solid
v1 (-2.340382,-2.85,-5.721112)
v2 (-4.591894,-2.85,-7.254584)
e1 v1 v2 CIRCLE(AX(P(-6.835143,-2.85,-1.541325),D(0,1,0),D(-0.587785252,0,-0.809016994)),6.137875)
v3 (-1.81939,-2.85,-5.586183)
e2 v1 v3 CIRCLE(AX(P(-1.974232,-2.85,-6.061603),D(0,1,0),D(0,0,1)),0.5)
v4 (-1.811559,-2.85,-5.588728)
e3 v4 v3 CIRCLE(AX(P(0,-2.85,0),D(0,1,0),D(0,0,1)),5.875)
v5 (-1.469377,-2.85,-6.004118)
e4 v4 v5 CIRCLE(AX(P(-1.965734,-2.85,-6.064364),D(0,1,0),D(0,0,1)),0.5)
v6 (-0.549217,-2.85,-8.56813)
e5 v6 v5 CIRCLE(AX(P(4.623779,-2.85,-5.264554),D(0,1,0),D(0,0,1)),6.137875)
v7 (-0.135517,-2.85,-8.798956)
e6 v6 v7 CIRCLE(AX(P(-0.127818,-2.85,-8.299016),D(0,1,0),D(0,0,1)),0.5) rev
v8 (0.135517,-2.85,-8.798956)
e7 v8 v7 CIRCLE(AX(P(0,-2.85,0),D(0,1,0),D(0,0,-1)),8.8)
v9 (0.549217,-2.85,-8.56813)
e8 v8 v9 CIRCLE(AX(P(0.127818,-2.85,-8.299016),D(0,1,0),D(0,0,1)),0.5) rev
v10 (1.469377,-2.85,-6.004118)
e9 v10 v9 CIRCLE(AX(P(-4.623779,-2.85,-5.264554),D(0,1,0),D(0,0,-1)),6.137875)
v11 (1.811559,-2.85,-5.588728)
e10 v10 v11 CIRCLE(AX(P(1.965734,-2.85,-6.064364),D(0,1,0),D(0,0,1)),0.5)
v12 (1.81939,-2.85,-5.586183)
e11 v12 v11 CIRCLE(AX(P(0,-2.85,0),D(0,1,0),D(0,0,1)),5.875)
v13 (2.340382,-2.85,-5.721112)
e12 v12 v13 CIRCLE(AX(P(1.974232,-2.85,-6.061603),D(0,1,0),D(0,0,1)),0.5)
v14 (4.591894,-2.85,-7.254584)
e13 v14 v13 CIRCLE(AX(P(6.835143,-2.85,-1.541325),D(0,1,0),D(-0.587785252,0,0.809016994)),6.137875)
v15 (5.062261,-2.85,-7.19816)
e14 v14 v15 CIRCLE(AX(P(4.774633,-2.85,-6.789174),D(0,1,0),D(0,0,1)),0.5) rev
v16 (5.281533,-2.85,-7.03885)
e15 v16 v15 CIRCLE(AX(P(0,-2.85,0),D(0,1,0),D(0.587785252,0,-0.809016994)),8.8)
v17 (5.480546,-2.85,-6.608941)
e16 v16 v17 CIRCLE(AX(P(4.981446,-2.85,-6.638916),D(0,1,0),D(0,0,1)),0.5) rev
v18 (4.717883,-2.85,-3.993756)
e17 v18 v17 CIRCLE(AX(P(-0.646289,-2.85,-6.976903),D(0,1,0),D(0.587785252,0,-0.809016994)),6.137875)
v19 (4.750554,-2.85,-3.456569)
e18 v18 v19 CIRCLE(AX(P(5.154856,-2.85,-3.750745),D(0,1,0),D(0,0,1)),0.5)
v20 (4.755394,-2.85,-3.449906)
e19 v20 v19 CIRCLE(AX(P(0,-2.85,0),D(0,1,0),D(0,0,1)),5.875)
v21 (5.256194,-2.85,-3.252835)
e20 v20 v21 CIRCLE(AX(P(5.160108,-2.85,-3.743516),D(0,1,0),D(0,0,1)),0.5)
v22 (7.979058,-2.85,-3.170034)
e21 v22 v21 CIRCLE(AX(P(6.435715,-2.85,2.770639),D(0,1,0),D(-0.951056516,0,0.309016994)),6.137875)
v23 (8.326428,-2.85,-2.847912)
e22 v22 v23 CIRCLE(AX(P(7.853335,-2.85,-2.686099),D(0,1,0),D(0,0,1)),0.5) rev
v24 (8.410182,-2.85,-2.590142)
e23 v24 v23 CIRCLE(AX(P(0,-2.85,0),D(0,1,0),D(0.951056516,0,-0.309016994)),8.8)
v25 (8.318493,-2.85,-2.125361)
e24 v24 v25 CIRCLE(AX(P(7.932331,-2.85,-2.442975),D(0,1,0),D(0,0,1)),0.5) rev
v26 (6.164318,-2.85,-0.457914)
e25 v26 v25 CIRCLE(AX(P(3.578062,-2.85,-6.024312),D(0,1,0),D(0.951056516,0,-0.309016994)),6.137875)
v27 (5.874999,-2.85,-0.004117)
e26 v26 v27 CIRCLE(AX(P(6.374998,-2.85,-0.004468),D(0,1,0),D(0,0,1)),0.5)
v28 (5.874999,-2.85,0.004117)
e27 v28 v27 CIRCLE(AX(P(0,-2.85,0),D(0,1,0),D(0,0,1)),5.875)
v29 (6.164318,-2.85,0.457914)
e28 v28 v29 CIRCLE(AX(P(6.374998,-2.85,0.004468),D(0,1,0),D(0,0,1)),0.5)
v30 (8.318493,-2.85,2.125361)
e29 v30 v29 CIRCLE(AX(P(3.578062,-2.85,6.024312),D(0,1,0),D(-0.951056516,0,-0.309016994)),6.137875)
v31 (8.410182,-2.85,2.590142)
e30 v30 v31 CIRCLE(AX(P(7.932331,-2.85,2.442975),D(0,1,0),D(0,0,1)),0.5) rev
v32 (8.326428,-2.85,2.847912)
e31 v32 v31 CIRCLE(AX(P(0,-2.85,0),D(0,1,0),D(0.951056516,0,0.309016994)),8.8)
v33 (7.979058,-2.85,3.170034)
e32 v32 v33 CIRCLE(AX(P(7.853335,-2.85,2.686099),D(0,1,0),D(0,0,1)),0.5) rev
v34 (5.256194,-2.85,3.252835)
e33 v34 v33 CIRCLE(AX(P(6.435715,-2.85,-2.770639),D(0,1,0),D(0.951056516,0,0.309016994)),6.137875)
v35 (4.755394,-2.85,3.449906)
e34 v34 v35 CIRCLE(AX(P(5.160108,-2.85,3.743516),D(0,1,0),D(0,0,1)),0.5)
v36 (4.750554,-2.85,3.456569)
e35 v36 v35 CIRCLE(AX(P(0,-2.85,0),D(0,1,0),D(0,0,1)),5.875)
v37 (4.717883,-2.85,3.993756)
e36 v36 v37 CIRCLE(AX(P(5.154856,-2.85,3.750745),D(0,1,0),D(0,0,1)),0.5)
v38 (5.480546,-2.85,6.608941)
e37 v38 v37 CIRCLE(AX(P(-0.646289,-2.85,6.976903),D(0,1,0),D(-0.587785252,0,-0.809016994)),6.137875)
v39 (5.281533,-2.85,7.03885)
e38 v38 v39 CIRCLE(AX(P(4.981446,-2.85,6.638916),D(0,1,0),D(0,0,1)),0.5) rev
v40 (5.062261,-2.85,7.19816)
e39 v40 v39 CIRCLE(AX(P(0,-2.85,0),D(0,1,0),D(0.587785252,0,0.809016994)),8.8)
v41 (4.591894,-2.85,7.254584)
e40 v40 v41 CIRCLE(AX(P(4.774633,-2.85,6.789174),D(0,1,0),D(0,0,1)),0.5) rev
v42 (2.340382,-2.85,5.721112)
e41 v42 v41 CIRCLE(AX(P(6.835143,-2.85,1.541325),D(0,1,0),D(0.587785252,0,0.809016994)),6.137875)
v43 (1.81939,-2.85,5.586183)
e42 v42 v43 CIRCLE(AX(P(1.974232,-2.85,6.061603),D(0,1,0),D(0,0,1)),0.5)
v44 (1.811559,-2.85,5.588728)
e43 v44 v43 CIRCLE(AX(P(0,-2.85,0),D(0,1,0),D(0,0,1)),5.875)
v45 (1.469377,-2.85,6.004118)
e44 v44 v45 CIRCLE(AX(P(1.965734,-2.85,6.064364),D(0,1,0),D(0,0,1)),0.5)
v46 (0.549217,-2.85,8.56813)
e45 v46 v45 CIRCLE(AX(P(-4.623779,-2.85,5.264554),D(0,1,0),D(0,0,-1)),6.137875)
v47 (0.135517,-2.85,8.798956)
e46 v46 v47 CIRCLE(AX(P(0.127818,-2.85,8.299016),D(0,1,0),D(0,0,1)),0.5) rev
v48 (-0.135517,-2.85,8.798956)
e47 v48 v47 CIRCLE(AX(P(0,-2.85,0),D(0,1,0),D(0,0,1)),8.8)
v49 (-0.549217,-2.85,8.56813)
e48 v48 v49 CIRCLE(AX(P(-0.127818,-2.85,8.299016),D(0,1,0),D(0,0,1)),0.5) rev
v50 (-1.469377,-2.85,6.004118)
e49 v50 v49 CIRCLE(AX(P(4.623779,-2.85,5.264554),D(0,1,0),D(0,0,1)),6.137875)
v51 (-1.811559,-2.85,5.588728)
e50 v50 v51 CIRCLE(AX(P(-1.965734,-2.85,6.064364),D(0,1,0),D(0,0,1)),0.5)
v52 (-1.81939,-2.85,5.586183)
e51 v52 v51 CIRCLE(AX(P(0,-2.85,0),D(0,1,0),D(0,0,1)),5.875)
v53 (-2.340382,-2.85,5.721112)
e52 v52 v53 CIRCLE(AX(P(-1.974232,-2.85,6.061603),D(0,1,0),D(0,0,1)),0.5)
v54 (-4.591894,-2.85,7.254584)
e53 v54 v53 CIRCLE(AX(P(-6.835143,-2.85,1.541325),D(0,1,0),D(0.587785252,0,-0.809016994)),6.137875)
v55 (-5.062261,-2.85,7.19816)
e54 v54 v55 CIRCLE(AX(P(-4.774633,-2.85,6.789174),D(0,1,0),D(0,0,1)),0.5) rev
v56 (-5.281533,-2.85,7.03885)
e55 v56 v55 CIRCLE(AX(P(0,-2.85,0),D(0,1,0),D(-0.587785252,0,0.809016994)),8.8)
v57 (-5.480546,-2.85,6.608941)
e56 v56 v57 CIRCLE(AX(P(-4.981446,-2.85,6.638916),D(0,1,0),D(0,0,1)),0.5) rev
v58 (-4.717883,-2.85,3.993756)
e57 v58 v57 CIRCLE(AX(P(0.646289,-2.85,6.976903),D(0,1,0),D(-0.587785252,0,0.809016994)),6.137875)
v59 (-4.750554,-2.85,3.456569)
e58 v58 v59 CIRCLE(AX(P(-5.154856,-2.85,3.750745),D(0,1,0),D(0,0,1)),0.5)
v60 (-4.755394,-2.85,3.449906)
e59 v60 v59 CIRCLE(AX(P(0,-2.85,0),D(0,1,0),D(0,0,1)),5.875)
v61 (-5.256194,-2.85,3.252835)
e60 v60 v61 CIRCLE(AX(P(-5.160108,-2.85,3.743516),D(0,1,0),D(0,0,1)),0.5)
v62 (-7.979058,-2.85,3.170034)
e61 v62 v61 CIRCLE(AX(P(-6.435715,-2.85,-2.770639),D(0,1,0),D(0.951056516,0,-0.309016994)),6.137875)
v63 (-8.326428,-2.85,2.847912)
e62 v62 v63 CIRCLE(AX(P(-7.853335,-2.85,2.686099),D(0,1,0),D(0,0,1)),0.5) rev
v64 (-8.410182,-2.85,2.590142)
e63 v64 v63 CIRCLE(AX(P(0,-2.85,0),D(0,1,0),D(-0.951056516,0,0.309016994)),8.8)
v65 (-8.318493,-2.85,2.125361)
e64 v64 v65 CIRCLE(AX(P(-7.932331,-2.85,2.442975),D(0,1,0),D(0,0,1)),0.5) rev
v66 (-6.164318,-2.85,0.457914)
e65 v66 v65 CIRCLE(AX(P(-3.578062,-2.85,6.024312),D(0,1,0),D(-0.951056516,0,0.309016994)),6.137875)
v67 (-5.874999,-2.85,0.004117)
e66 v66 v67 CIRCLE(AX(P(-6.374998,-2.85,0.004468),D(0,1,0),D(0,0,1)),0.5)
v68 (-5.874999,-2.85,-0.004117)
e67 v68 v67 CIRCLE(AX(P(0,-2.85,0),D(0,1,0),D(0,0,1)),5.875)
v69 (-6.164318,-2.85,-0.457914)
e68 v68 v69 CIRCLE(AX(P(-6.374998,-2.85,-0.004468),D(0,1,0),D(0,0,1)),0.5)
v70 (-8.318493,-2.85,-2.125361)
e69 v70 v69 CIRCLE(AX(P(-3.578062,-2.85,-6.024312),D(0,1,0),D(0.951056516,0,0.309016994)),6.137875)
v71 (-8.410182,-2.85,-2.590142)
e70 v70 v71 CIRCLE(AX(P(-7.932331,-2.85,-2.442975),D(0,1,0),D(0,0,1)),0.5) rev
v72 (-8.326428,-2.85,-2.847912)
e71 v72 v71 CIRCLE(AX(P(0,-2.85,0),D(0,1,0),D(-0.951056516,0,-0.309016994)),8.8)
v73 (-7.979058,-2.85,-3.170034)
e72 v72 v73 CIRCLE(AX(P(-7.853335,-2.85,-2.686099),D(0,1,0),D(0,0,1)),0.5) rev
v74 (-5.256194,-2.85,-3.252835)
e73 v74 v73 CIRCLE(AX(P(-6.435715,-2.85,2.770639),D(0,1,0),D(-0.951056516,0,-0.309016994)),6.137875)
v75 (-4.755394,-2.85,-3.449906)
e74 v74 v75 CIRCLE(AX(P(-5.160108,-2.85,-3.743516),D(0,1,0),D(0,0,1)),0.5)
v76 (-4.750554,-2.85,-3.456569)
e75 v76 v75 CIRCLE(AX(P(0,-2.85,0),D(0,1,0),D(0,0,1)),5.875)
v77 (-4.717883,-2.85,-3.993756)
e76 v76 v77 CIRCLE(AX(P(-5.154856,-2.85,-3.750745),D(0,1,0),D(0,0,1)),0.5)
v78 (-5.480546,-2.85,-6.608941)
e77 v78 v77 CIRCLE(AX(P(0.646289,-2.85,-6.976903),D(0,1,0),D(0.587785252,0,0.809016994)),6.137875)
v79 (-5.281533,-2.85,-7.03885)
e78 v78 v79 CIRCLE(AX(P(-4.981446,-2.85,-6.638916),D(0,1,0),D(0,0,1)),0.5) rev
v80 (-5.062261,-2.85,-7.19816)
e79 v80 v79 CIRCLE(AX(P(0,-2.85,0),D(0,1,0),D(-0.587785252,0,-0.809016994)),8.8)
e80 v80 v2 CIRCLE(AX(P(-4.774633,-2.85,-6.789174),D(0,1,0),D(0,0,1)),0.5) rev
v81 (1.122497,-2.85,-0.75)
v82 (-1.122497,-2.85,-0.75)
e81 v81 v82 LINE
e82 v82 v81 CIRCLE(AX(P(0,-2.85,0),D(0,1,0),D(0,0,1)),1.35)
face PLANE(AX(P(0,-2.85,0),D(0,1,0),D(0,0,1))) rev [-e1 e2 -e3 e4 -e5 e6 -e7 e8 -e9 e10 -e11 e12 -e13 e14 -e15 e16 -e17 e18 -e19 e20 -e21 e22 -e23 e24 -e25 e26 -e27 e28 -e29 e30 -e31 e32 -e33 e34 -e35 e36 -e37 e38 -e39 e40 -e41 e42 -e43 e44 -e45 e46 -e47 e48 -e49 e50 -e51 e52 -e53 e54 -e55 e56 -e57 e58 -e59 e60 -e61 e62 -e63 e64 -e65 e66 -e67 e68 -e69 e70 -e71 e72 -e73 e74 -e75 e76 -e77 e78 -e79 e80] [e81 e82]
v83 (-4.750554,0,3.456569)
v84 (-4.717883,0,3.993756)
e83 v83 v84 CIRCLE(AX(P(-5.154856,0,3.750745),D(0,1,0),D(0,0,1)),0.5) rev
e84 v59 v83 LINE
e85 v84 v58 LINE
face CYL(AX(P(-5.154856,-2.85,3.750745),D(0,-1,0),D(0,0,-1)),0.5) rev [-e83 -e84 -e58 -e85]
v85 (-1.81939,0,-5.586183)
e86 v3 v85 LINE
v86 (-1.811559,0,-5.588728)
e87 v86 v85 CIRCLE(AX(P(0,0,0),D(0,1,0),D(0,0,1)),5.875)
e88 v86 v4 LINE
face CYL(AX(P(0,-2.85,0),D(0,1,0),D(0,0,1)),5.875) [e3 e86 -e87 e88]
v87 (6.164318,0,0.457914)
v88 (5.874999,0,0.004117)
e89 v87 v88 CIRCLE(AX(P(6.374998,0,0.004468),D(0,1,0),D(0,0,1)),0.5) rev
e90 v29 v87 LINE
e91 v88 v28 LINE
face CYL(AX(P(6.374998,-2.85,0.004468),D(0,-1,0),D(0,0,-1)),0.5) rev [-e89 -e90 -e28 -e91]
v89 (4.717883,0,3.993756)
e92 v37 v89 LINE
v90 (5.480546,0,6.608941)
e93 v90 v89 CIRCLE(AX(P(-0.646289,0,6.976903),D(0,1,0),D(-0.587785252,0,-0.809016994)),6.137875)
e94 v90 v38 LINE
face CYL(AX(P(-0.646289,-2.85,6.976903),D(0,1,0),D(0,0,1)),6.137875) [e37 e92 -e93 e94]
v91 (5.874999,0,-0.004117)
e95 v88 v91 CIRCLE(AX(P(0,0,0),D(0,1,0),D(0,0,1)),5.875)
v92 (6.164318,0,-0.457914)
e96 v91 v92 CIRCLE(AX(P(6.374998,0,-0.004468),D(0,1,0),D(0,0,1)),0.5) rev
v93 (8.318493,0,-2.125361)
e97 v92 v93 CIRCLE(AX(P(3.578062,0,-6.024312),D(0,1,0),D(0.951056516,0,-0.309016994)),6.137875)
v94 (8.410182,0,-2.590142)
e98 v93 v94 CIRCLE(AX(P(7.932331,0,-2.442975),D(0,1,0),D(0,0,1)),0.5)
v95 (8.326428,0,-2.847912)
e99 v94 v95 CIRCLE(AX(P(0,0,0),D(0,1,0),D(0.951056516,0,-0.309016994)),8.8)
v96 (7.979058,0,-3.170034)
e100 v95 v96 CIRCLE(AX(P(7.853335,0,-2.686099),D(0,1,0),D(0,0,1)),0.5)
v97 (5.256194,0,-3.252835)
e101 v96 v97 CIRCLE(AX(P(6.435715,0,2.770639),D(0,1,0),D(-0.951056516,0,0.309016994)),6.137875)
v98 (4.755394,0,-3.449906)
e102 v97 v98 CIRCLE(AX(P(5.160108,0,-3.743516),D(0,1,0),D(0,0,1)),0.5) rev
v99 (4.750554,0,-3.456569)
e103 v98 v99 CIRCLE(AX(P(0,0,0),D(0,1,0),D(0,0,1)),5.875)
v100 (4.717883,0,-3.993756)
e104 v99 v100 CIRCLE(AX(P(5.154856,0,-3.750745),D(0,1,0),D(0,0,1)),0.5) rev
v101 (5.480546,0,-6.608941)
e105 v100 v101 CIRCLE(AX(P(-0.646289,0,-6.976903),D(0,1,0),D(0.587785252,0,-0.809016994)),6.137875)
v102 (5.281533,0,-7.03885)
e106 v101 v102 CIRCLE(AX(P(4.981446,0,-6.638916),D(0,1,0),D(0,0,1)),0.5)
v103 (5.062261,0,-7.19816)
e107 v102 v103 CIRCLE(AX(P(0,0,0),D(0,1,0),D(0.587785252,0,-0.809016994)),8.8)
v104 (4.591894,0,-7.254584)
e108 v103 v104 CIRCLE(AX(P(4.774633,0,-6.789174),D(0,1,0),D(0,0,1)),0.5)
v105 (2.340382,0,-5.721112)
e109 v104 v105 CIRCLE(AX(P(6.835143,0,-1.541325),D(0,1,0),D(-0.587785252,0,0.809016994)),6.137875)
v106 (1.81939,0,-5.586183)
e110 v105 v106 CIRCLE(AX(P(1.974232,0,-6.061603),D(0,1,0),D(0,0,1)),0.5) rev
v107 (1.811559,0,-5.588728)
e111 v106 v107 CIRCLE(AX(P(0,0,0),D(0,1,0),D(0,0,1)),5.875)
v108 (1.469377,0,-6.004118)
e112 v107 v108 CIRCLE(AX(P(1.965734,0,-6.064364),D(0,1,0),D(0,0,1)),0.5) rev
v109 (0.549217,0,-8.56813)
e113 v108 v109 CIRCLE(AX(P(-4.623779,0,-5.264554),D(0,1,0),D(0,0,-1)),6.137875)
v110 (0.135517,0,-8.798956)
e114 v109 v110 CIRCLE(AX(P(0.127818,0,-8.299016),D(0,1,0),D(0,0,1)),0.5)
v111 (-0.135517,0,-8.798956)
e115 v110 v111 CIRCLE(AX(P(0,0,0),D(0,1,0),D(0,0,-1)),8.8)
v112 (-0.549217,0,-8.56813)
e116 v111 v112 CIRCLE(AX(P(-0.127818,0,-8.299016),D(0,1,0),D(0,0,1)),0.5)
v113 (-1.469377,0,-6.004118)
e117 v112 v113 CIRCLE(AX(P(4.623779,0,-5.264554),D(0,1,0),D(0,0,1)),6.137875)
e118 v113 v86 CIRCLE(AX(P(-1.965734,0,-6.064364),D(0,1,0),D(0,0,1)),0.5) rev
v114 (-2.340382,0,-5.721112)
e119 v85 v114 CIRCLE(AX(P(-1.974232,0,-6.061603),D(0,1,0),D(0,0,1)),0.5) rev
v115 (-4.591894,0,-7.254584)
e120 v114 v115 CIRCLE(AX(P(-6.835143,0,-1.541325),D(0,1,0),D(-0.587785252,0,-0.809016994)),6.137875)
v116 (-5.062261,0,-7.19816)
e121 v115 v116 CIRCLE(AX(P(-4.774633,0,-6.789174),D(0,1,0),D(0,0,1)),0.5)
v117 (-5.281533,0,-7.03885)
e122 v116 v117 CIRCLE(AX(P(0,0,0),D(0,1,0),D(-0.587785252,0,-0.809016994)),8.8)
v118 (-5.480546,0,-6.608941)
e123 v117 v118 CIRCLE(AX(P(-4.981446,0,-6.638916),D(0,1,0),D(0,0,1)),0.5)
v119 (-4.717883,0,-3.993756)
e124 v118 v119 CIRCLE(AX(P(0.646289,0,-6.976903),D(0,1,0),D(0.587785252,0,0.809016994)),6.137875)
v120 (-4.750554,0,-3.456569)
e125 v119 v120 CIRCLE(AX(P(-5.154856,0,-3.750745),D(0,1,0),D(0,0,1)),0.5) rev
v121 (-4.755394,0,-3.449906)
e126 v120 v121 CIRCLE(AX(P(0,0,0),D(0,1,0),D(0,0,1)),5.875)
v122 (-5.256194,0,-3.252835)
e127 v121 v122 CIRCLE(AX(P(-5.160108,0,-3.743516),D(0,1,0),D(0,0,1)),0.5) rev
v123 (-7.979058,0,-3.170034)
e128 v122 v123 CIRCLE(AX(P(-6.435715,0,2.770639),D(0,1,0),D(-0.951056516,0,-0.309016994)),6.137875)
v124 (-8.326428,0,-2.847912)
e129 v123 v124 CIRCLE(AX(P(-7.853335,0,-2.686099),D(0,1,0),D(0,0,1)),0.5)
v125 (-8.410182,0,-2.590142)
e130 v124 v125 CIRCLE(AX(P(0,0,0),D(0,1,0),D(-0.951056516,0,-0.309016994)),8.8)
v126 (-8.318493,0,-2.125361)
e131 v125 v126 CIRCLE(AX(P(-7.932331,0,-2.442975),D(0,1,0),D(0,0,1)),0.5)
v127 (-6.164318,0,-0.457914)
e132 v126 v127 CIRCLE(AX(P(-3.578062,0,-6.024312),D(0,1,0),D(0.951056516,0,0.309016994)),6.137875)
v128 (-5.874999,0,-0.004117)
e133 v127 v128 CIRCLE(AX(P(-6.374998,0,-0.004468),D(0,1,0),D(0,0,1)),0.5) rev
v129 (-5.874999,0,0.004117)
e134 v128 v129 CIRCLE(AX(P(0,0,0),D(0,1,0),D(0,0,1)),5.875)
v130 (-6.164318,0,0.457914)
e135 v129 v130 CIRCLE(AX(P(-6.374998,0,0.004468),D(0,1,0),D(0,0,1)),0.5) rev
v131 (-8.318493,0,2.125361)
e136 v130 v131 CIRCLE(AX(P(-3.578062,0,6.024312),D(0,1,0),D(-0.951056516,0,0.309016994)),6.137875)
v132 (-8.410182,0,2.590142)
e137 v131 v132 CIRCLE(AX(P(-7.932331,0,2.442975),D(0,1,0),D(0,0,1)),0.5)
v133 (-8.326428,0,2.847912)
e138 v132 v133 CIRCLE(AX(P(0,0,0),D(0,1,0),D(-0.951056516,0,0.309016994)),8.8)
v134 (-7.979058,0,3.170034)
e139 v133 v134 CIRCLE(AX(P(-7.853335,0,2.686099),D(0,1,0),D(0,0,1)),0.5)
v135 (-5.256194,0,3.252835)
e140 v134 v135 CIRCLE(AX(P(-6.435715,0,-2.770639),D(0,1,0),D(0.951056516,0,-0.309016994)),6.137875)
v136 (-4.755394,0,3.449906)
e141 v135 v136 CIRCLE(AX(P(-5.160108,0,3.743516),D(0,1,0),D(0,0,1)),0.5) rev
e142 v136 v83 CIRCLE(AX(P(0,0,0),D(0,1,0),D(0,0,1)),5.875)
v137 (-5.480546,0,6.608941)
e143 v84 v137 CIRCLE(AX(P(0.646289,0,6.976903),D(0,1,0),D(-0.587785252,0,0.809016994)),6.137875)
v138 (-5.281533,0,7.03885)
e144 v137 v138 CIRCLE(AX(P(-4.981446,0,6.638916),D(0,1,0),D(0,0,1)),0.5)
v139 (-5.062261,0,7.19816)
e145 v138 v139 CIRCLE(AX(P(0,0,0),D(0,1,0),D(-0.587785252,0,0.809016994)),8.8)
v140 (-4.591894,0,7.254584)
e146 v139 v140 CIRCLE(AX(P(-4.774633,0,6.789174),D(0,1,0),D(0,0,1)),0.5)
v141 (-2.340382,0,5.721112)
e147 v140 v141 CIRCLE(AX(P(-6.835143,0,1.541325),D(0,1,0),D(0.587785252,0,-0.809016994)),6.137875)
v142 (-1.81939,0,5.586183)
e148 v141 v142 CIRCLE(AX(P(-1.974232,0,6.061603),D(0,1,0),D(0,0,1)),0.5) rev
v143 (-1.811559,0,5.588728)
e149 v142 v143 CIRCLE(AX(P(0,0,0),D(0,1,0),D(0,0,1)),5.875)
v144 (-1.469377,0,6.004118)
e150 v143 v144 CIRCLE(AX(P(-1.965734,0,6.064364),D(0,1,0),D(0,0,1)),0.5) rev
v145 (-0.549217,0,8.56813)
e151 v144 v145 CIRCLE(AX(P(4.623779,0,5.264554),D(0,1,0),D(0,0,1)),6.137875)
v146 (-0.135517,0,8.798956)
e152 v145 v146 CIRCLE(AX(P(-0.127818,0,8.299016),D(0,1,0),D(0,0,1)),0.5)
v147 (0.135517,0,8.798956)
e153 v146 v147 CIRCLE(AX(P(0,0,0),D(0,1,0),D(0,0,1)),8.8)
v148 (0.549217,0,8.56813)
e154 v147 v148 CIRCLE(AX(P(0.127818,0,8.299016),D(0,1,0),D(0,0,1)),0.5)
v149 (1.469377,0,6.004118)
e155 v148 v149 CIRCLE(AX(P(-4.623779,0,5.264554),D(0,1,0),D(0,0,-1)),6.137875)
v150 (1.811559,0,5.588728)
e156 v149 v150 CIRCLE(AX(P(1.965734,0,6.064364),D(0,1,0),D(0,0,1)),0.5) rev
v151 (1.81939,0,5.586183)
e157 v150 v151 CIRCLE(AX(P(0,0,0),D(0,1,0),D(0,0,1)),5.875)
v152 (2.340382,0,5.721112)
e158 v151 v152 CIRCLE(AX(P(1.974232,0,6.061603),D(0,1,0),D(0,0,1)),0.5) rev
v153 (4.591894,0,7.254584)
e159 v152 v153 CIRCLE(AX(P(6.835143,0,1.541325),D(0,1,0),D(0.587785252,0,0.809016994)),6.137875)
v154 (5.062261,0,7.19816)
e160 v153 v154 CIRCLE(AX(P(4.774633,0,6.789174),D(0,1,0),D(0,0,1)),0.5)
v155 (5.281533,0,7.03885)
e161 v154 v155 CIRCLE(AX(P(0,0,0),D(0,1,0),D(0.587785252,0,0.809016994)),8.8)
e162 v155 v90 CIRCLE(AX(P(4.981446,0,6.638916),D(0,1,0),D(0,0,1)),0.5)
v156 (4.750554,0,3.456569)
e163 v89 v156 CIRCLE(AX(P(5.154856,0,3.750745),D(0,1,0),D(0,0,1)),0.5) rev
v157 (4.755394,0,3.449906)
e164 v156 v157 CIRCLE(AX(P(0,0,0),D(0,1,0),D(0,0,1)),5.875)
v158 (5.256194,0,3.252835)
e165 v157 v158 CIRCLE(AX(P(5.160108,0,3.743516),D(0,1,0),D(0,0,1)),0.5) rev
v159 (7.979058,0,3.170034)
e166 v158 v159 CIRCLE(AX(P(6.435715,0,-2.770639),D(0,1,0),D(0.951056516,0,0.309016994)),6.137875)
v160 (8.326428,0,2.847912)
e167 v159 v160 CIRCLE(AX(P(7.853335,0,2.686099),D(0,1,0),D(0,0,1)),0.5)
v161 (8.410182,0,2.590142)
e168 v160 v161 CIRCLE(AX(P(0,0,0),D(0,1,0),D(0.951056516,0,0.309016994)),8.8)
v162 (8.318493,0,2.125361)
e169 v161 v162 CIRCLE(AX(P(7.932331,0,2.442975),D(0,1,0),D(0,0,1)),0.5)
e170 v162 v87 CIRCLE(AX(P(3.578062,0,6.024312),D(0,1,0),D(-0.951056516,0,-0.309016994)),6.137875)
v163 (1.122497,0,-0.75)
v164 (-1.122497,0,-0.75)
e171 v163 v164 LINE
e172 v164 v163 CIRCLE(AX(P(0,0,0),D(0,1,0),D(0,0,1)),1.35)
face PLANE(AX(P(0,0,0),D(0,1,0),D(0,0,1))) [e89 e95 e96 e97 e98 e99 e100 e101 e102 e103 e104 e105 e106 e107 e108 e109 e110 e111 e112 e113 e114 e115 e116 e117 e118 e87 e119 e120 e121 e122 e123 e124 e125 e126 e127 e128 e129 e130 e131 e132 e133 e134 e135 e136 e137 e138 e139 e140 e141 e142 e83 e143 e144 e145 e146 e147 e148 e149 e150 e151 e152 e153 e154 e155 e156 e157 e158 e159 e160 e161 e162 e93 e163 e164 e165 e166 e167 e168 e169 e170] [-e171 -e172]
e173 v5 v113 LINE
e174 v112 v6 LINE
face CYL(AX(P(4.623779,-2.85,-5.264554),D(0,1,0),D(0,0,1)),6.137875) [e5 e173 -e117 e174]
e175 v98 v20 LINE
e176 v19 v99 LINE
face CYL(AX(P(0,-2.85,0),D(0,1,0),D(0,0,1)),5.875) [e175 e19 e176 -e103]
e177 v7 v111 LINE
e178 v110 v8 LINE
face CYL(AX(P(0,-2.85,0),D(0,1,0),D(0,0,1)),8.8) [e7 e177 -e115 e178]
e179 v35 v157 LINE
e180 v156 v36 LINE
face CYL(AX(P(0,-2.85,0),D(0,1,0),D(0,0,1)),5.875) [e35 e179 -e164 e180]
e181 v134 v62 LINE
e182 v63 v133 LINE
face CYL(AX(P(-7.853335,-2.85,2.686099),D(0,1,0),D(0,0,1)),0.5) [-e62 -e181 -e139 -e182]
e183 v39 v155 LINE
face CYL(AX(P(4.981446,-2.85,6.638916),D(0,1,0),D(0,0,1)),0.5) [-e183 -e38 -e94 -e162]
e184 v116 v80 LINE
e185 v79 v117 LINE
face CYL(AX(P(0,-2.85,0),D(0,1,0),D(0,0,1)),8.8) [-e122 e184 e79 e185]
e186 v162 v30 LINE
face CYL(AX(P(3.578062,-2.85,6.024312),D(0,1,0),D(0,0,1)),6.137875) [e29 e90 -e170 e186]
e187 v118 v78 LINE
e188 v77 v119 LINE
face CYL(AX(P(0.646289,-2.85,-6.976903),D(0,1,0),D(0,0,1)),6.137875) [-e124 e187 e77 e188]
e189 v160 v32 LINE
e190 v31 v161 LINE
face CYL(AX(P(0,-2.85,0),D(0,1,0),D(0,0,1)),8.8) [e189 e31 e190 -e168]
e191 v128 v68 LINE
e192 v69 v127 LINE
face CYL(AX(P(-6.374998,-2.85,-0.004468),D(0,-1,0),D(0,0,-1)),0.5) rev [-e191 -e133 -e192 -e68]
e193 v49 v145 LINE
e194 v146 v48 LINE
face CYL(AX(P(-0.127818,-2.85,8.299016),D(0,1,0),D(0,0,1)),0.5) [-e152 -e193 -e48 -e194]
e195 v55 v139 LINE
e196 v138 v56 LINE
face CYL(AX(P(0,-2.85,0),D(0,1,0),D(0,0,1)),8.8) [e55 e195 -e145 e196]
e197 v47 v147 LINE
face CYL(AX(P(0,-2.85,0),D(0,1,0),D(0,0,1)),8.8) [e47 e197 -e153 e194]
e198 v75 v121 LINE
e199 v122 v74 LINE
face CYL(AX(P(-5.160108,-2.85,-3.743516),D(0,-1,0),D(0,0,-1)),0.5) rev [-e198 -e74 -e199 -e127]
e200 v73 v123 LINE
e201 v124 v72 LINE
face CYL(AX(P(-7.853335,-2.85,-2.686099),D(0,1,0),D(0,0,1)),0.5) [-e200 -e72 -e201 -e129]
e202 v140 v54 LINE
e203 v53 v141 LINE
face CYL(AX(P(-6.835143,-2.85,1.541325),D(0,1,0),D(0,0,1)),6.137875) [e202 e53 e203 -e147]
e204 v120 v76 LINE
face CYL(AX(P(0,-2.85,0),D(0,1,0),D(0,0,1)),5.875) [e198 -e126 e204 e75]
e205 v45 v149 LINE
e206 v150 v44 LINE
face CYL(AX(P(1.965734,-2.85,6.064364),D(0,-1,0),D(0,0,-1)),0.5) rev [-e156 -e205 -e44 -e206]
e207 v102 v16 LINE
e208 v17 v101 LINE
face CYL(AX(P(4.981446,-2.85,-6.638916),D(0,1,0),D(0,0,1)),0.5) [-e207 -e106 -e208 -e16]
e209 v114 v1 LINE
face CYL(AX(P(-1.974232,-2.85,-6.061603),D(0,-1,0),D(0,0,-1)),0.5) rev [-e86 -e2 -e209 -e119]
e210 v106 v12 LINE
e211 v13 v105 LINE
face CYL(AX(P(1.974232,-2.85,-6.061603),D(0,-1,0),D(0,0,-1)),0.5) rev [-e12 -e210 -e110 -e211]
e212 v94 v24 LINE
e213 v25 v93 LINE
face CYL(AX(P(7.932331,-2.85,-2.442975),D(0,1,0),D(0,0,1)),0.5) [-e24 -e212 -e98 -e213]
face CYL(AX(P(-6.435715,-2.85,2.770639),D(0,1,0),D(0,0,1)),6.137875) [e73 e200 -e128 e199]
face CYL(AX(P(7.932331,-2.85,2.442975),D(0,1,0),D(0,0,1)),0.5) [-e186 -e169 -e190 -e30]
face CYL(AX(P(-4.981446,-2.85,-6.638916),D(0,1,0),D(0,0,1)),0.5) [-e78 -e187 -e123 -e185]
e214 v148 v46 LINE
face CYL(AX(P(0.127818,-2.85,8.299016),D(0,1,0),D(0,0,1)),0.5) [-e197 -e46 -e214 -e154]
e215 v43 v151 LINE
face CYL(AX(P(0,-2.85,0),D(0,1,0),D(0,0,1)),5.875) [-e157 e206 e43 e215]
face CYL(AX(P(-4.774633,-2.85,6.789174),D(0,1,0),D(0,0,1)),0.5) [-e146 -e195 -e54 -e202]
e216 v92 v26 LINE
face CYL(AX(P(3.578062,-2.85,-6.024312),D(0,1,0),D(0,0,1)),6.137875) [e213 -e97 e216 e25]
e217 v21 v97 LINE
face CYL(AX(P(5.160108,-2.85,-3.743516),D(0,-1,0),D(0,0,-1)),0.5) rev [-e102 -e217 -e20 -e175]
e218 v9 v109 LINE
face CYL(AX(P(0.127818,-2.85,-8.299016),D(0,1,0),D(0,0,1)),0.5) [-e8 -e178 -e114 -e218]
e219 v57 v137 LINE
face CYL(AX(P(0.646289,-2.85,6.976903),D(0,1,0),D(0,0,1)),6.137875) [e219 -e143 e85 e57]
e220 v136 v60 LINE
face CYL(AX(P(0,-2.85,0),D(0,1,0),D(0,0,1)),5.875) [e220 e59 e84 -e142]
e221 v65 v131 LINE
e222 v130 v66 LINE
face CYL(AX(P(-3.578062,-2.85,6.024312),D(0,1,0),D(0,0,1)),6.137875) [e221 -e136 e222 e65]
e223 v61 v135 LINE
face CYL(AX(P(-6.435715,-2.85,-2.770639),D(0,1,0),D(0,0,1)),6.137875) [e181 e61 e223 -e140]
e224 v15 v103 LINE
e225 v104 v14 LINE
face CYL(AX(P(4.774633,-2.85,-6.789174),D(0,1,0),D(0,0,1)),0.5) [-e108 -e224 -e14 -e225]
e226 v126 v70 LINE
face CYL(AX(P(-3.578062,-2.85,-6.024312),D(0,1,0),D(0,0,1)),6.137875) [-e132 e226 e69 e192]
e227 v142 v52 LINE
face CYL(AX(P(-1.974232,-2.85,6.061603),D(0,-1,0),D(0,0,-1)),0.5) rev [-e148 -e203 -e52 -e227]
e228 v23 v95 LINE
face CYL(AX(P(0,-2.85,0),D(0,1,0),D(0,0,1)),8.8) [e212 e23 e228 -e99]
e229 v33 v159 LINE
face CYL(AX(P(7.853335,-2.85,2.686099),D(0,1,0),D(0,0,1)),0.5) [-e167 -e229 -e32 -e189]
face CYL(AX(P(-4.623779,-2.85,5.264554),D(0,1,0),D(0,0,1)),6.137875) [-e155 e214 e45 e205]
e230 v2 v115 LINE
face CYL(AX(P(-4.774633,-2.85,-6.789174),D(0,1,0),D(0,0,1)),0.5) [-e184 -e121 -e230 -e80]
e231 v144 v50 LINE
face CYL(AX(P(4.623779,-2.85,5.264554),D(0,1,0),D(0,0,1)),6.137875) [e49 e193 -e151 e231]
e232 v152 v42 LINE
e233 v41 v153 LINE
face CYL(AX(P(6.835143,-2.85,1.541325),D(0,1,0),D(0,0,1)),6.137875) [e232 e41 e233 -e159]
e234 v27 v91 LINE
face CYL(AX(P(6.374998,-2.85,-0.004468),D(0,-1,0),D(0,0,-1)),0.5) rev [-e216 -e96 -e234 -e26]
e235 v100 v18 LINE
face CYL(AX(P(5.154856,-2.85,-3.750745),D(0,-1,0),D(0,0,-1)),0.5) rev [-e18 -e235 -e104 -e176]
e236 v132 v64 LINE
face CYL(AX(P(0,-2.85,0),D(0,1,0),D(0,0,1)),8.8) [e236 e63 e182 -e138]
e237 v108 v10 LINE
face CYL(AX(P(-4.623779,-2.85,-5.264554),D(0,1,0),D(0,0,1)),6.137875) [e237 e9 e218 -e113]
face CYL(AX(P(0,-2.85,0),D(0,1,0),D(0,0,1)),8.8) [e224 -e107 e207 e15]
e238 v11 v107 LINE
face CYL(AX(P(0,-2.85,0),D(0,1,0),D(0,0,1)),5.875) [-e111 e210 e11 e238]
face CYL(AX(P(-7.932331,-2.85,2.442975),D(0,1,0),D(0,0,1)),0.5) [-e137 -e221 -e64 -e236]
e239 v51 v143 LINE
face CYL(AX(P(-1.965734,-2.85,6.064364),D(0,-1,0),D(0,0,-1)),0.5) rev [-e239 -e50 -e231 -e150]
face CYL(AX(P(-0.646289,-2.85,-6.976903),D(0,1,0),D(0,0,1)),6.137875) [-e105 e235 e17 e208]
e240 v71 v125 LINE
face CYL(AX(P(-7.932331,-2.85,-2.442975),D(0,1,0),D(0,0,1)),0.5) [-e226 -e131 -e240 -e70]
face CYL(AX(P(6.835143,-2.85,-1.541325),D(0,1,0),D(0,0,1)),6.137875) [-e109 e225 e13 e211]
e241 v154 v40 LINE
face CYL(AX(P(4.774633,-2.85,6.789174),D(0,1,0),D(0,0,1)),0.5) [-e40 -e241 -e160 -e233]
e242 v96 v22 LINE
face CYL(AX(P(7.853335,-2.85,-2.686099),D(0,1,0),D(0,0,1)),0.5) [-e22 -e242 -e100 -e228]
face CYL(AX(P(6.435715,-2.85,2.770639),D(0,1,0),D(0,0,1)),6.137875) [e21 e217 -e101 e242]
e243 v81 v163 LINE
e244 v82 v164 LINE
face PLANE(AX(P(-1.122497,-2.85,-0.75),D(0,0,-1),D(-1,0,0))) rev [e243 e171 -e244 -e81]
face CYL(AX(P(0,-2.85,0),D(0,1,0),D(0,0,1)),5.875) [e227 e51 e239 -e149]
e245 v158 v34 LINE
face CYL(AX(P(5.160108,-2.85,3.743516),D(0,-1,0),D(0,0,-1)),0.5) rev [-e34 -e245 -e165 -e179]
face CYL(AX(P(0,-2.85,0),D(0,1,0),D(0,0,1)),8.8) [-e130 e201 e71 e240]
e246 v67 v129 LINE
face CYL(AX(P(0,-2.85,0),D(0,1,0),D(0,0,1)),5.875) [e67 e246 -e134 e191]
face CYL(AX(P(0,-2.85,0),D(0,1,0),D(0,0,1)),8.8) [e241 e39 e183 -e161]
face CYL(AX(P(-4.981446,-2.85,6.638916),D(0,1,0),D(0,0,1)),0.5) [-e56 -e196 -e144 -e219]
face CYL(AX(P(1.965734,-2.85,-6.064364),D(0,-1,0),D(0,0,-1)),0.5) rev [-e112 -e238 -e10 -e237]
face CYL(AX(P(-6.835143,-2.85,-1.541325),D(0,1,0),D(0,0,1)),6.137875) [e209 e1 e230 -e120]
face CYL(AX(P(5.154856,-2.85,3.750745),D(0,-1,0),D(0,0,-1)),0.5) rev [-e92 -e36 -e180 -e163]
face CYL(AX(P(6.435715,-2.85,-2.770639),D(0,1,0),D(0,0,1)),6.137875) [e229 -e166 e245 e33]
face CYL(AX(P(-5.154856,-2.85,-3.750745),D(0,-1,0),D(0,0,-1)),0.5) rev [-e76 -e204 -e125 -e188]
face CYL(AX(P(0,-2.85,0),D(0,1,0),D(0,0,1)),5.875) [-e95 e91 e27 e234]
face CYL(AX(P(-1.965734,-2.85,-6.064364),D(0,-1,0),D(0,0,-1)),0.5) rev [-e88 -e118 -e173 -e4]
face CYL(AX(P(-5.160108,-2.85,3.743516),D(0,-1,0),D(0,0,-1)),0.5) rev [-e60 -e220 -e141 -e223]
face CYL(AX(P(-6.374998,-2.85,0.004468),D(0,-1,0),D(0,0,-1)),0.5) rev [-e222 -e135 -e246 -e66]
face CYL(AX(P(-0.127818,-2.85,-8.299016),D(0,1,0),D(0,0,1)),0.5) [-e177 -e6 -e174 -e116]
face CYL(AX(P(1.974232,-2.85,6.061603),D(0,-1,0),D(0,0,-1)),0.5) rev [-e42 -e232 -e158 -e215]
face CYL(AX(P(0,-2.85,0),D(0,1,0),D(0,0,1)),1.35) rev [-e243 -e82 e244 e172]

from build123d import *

# Parameters (mm, degrees)
SKETCH1_R                = 5.875
BASE_FLANGE2_DEPTH       = 2.85
TAB1_START               = -2.85
TAB1_DEPTH               = 2.85
FILLET1_R                = 0.5
CIRPATTERN1_COUNT        = 10
FILLET1_OF_CIRPATTERN1_R = 0.5
CUT_EXTRUDE1_DEPTH       = 13.516657182


# Read off the part's stored shape, not the designer's step: Tab1
# Sheet-metal steps are written as plain solids
with BuildPart() as part:
    # Sketch1 → Base-Flange2 (new body)
    with BuildSketch(Plane(origin=(0, 0, 0), x_dir=(1, 0, 0), z_dir=(0, 1, 0))):
        with Locations(Location((0, 0, 0), (0, 0, 270))):
            Circle(SKETCH1_R)
    extrude(amount=-BASE_FLANGE2_DEPTH)

    # Tab1 outline → Tab1 (add)
    with BuildSketch(Plane(origin=(0, 0, 0), x_dir=(1, 0, 0), z_dir=(0, 1, 0)).offset(TAB1_START)):
        with BuildLine():
            ThreePointArc((0.4, 8.79090439), (0, 8.8), (-0.4, 8.79090439))
            ThreePointArc((-0.4, 8.79090439), (-1.1629301, 7.310892011), (-1.5, 5.680283884))
            ThreePointArc((-1.5, 5.680283884), (0, 5.875), (1.5, 5.680283884))
            ThreePointArc((1.5, 5.680283884), (1.1629301, 7.310892011), (0.4, 8.79090439))
        make_face()
    tab1 = extrude(amount=TAB1_DEPTH)

    # Fillet1
    fillet1_edges = [part.edges().sort_by_distance(p)[0] for p in [
        (-1.5, -1.425, -5.680283884),
        (-0.4, -1.425, -8.79090439),
        (0.4, -1.425, -8.79090439),
        (1.5, -1.425, -5.680283884),
    ]]
    fillet(fillet1_edges, radius=FILLET1_R)

    # CirPattern1: Tab1 ×10 about axis
    cirpattern1_axis = Axis((0, 0, 0), (0, 1, 0))
    for i in range(1, CIRPATTERN1_COUNT):
        add(tab1.rotate(cirpattern1_axis, i * 360 / CIRPATTERN1_COUNT))

    # Fillet1 of CirPattern1
    fillet1_of_cirpattern1_edges = [part.edges().sort_by_distance(p)[0] for p in [
        (-4.552312587, -1.425, -3.713768317),
        (-5.490770753, -1.425, -6.876876947),
        (-4.843557157, -1.425, -7.347105148),
        (-2.125261604, -1.425, -5.477124073),
        (-5.865796494, -1.425, -0.328719479),
        (-8.484253702, -1.425, -2.336116246),
        (-8.237040106, -1.425, -3.096961459),
        (-4.938745511, -1.425, -3.181889027),
        (-4.938745511, -1.425, 3.181889027),
        (-8.237040106, -1.425, 3.096961459),
        (-8.484253702, -1.425, 2.336116246),
        (-5.865796494, -1.425, 0.328719479),
        (-2.125261604, -1.425, 5.477124073),
        (-4.843557157, -1.425, 7.347105148),
        (-5.490770753, -1.425, 6.876876947),
        (-4.552312587, -1.425, 3.713768317),
        (1.5, -1.425, 5.680283884),
        (0.4, -1.425, 8.79090439),
        (-0.4, -1.425, 8.79090439),
        (-1.5, -1.425, 5.680283884),
        (4.552312587, -1.425, 3.713768317),
        (5.490770753, -1.425, 6.876876947),
        (4.843557157, -1.425, 7.347105148),
        (2.125261604, -1.425, 5.477124073),
        (5.865796494, -1.425, 0.328719479),
        (8.484253702, -1.425, 2.336116246),
        (8.237040106, -1.425, 3.096961459),
        (4.938745511, -1.425, 3.181889027),
        (4.938745511, -1.425, -3.181889027),
        (8.237040106, -1.425, -3.096961459),
        (8.484253702, -1.425, -2.336116246),
        (5.865796494, -1.425, -0.328719479),
        (2.125261604, -1.425, -5.477124073),
        (4.843557157, -1.425, -7.347105148),
        (5.490770753, -1.425, -6.876876947),
        (4.552312587, -1.425, -3.713768317),
    ]]
    fillet(fillet1_of_cirpattern1_edges, radius=FILLET1_OF_CIRPATTERN1_R)

    # Sketch11 → Cut-Extrude1 (cut, through all)
    with BuildSketch(Plane(origin=(0, 0, 0), x_dir=(1, 0, 0), z_dir=(0, 1, 0))):
        with BuildLine():
            Line((-1.122497216, 0.75), (1.122497216, 0.75))
            ThreePointArc((1.122497216, 0.75), (0, -1.35), (-1.122497216, 0.75))
        make_face()
    extrude(amount=-CUT_EXTRUDE1_DEPTH, mode=Mode.SUBTRACT)


solid = part.part
